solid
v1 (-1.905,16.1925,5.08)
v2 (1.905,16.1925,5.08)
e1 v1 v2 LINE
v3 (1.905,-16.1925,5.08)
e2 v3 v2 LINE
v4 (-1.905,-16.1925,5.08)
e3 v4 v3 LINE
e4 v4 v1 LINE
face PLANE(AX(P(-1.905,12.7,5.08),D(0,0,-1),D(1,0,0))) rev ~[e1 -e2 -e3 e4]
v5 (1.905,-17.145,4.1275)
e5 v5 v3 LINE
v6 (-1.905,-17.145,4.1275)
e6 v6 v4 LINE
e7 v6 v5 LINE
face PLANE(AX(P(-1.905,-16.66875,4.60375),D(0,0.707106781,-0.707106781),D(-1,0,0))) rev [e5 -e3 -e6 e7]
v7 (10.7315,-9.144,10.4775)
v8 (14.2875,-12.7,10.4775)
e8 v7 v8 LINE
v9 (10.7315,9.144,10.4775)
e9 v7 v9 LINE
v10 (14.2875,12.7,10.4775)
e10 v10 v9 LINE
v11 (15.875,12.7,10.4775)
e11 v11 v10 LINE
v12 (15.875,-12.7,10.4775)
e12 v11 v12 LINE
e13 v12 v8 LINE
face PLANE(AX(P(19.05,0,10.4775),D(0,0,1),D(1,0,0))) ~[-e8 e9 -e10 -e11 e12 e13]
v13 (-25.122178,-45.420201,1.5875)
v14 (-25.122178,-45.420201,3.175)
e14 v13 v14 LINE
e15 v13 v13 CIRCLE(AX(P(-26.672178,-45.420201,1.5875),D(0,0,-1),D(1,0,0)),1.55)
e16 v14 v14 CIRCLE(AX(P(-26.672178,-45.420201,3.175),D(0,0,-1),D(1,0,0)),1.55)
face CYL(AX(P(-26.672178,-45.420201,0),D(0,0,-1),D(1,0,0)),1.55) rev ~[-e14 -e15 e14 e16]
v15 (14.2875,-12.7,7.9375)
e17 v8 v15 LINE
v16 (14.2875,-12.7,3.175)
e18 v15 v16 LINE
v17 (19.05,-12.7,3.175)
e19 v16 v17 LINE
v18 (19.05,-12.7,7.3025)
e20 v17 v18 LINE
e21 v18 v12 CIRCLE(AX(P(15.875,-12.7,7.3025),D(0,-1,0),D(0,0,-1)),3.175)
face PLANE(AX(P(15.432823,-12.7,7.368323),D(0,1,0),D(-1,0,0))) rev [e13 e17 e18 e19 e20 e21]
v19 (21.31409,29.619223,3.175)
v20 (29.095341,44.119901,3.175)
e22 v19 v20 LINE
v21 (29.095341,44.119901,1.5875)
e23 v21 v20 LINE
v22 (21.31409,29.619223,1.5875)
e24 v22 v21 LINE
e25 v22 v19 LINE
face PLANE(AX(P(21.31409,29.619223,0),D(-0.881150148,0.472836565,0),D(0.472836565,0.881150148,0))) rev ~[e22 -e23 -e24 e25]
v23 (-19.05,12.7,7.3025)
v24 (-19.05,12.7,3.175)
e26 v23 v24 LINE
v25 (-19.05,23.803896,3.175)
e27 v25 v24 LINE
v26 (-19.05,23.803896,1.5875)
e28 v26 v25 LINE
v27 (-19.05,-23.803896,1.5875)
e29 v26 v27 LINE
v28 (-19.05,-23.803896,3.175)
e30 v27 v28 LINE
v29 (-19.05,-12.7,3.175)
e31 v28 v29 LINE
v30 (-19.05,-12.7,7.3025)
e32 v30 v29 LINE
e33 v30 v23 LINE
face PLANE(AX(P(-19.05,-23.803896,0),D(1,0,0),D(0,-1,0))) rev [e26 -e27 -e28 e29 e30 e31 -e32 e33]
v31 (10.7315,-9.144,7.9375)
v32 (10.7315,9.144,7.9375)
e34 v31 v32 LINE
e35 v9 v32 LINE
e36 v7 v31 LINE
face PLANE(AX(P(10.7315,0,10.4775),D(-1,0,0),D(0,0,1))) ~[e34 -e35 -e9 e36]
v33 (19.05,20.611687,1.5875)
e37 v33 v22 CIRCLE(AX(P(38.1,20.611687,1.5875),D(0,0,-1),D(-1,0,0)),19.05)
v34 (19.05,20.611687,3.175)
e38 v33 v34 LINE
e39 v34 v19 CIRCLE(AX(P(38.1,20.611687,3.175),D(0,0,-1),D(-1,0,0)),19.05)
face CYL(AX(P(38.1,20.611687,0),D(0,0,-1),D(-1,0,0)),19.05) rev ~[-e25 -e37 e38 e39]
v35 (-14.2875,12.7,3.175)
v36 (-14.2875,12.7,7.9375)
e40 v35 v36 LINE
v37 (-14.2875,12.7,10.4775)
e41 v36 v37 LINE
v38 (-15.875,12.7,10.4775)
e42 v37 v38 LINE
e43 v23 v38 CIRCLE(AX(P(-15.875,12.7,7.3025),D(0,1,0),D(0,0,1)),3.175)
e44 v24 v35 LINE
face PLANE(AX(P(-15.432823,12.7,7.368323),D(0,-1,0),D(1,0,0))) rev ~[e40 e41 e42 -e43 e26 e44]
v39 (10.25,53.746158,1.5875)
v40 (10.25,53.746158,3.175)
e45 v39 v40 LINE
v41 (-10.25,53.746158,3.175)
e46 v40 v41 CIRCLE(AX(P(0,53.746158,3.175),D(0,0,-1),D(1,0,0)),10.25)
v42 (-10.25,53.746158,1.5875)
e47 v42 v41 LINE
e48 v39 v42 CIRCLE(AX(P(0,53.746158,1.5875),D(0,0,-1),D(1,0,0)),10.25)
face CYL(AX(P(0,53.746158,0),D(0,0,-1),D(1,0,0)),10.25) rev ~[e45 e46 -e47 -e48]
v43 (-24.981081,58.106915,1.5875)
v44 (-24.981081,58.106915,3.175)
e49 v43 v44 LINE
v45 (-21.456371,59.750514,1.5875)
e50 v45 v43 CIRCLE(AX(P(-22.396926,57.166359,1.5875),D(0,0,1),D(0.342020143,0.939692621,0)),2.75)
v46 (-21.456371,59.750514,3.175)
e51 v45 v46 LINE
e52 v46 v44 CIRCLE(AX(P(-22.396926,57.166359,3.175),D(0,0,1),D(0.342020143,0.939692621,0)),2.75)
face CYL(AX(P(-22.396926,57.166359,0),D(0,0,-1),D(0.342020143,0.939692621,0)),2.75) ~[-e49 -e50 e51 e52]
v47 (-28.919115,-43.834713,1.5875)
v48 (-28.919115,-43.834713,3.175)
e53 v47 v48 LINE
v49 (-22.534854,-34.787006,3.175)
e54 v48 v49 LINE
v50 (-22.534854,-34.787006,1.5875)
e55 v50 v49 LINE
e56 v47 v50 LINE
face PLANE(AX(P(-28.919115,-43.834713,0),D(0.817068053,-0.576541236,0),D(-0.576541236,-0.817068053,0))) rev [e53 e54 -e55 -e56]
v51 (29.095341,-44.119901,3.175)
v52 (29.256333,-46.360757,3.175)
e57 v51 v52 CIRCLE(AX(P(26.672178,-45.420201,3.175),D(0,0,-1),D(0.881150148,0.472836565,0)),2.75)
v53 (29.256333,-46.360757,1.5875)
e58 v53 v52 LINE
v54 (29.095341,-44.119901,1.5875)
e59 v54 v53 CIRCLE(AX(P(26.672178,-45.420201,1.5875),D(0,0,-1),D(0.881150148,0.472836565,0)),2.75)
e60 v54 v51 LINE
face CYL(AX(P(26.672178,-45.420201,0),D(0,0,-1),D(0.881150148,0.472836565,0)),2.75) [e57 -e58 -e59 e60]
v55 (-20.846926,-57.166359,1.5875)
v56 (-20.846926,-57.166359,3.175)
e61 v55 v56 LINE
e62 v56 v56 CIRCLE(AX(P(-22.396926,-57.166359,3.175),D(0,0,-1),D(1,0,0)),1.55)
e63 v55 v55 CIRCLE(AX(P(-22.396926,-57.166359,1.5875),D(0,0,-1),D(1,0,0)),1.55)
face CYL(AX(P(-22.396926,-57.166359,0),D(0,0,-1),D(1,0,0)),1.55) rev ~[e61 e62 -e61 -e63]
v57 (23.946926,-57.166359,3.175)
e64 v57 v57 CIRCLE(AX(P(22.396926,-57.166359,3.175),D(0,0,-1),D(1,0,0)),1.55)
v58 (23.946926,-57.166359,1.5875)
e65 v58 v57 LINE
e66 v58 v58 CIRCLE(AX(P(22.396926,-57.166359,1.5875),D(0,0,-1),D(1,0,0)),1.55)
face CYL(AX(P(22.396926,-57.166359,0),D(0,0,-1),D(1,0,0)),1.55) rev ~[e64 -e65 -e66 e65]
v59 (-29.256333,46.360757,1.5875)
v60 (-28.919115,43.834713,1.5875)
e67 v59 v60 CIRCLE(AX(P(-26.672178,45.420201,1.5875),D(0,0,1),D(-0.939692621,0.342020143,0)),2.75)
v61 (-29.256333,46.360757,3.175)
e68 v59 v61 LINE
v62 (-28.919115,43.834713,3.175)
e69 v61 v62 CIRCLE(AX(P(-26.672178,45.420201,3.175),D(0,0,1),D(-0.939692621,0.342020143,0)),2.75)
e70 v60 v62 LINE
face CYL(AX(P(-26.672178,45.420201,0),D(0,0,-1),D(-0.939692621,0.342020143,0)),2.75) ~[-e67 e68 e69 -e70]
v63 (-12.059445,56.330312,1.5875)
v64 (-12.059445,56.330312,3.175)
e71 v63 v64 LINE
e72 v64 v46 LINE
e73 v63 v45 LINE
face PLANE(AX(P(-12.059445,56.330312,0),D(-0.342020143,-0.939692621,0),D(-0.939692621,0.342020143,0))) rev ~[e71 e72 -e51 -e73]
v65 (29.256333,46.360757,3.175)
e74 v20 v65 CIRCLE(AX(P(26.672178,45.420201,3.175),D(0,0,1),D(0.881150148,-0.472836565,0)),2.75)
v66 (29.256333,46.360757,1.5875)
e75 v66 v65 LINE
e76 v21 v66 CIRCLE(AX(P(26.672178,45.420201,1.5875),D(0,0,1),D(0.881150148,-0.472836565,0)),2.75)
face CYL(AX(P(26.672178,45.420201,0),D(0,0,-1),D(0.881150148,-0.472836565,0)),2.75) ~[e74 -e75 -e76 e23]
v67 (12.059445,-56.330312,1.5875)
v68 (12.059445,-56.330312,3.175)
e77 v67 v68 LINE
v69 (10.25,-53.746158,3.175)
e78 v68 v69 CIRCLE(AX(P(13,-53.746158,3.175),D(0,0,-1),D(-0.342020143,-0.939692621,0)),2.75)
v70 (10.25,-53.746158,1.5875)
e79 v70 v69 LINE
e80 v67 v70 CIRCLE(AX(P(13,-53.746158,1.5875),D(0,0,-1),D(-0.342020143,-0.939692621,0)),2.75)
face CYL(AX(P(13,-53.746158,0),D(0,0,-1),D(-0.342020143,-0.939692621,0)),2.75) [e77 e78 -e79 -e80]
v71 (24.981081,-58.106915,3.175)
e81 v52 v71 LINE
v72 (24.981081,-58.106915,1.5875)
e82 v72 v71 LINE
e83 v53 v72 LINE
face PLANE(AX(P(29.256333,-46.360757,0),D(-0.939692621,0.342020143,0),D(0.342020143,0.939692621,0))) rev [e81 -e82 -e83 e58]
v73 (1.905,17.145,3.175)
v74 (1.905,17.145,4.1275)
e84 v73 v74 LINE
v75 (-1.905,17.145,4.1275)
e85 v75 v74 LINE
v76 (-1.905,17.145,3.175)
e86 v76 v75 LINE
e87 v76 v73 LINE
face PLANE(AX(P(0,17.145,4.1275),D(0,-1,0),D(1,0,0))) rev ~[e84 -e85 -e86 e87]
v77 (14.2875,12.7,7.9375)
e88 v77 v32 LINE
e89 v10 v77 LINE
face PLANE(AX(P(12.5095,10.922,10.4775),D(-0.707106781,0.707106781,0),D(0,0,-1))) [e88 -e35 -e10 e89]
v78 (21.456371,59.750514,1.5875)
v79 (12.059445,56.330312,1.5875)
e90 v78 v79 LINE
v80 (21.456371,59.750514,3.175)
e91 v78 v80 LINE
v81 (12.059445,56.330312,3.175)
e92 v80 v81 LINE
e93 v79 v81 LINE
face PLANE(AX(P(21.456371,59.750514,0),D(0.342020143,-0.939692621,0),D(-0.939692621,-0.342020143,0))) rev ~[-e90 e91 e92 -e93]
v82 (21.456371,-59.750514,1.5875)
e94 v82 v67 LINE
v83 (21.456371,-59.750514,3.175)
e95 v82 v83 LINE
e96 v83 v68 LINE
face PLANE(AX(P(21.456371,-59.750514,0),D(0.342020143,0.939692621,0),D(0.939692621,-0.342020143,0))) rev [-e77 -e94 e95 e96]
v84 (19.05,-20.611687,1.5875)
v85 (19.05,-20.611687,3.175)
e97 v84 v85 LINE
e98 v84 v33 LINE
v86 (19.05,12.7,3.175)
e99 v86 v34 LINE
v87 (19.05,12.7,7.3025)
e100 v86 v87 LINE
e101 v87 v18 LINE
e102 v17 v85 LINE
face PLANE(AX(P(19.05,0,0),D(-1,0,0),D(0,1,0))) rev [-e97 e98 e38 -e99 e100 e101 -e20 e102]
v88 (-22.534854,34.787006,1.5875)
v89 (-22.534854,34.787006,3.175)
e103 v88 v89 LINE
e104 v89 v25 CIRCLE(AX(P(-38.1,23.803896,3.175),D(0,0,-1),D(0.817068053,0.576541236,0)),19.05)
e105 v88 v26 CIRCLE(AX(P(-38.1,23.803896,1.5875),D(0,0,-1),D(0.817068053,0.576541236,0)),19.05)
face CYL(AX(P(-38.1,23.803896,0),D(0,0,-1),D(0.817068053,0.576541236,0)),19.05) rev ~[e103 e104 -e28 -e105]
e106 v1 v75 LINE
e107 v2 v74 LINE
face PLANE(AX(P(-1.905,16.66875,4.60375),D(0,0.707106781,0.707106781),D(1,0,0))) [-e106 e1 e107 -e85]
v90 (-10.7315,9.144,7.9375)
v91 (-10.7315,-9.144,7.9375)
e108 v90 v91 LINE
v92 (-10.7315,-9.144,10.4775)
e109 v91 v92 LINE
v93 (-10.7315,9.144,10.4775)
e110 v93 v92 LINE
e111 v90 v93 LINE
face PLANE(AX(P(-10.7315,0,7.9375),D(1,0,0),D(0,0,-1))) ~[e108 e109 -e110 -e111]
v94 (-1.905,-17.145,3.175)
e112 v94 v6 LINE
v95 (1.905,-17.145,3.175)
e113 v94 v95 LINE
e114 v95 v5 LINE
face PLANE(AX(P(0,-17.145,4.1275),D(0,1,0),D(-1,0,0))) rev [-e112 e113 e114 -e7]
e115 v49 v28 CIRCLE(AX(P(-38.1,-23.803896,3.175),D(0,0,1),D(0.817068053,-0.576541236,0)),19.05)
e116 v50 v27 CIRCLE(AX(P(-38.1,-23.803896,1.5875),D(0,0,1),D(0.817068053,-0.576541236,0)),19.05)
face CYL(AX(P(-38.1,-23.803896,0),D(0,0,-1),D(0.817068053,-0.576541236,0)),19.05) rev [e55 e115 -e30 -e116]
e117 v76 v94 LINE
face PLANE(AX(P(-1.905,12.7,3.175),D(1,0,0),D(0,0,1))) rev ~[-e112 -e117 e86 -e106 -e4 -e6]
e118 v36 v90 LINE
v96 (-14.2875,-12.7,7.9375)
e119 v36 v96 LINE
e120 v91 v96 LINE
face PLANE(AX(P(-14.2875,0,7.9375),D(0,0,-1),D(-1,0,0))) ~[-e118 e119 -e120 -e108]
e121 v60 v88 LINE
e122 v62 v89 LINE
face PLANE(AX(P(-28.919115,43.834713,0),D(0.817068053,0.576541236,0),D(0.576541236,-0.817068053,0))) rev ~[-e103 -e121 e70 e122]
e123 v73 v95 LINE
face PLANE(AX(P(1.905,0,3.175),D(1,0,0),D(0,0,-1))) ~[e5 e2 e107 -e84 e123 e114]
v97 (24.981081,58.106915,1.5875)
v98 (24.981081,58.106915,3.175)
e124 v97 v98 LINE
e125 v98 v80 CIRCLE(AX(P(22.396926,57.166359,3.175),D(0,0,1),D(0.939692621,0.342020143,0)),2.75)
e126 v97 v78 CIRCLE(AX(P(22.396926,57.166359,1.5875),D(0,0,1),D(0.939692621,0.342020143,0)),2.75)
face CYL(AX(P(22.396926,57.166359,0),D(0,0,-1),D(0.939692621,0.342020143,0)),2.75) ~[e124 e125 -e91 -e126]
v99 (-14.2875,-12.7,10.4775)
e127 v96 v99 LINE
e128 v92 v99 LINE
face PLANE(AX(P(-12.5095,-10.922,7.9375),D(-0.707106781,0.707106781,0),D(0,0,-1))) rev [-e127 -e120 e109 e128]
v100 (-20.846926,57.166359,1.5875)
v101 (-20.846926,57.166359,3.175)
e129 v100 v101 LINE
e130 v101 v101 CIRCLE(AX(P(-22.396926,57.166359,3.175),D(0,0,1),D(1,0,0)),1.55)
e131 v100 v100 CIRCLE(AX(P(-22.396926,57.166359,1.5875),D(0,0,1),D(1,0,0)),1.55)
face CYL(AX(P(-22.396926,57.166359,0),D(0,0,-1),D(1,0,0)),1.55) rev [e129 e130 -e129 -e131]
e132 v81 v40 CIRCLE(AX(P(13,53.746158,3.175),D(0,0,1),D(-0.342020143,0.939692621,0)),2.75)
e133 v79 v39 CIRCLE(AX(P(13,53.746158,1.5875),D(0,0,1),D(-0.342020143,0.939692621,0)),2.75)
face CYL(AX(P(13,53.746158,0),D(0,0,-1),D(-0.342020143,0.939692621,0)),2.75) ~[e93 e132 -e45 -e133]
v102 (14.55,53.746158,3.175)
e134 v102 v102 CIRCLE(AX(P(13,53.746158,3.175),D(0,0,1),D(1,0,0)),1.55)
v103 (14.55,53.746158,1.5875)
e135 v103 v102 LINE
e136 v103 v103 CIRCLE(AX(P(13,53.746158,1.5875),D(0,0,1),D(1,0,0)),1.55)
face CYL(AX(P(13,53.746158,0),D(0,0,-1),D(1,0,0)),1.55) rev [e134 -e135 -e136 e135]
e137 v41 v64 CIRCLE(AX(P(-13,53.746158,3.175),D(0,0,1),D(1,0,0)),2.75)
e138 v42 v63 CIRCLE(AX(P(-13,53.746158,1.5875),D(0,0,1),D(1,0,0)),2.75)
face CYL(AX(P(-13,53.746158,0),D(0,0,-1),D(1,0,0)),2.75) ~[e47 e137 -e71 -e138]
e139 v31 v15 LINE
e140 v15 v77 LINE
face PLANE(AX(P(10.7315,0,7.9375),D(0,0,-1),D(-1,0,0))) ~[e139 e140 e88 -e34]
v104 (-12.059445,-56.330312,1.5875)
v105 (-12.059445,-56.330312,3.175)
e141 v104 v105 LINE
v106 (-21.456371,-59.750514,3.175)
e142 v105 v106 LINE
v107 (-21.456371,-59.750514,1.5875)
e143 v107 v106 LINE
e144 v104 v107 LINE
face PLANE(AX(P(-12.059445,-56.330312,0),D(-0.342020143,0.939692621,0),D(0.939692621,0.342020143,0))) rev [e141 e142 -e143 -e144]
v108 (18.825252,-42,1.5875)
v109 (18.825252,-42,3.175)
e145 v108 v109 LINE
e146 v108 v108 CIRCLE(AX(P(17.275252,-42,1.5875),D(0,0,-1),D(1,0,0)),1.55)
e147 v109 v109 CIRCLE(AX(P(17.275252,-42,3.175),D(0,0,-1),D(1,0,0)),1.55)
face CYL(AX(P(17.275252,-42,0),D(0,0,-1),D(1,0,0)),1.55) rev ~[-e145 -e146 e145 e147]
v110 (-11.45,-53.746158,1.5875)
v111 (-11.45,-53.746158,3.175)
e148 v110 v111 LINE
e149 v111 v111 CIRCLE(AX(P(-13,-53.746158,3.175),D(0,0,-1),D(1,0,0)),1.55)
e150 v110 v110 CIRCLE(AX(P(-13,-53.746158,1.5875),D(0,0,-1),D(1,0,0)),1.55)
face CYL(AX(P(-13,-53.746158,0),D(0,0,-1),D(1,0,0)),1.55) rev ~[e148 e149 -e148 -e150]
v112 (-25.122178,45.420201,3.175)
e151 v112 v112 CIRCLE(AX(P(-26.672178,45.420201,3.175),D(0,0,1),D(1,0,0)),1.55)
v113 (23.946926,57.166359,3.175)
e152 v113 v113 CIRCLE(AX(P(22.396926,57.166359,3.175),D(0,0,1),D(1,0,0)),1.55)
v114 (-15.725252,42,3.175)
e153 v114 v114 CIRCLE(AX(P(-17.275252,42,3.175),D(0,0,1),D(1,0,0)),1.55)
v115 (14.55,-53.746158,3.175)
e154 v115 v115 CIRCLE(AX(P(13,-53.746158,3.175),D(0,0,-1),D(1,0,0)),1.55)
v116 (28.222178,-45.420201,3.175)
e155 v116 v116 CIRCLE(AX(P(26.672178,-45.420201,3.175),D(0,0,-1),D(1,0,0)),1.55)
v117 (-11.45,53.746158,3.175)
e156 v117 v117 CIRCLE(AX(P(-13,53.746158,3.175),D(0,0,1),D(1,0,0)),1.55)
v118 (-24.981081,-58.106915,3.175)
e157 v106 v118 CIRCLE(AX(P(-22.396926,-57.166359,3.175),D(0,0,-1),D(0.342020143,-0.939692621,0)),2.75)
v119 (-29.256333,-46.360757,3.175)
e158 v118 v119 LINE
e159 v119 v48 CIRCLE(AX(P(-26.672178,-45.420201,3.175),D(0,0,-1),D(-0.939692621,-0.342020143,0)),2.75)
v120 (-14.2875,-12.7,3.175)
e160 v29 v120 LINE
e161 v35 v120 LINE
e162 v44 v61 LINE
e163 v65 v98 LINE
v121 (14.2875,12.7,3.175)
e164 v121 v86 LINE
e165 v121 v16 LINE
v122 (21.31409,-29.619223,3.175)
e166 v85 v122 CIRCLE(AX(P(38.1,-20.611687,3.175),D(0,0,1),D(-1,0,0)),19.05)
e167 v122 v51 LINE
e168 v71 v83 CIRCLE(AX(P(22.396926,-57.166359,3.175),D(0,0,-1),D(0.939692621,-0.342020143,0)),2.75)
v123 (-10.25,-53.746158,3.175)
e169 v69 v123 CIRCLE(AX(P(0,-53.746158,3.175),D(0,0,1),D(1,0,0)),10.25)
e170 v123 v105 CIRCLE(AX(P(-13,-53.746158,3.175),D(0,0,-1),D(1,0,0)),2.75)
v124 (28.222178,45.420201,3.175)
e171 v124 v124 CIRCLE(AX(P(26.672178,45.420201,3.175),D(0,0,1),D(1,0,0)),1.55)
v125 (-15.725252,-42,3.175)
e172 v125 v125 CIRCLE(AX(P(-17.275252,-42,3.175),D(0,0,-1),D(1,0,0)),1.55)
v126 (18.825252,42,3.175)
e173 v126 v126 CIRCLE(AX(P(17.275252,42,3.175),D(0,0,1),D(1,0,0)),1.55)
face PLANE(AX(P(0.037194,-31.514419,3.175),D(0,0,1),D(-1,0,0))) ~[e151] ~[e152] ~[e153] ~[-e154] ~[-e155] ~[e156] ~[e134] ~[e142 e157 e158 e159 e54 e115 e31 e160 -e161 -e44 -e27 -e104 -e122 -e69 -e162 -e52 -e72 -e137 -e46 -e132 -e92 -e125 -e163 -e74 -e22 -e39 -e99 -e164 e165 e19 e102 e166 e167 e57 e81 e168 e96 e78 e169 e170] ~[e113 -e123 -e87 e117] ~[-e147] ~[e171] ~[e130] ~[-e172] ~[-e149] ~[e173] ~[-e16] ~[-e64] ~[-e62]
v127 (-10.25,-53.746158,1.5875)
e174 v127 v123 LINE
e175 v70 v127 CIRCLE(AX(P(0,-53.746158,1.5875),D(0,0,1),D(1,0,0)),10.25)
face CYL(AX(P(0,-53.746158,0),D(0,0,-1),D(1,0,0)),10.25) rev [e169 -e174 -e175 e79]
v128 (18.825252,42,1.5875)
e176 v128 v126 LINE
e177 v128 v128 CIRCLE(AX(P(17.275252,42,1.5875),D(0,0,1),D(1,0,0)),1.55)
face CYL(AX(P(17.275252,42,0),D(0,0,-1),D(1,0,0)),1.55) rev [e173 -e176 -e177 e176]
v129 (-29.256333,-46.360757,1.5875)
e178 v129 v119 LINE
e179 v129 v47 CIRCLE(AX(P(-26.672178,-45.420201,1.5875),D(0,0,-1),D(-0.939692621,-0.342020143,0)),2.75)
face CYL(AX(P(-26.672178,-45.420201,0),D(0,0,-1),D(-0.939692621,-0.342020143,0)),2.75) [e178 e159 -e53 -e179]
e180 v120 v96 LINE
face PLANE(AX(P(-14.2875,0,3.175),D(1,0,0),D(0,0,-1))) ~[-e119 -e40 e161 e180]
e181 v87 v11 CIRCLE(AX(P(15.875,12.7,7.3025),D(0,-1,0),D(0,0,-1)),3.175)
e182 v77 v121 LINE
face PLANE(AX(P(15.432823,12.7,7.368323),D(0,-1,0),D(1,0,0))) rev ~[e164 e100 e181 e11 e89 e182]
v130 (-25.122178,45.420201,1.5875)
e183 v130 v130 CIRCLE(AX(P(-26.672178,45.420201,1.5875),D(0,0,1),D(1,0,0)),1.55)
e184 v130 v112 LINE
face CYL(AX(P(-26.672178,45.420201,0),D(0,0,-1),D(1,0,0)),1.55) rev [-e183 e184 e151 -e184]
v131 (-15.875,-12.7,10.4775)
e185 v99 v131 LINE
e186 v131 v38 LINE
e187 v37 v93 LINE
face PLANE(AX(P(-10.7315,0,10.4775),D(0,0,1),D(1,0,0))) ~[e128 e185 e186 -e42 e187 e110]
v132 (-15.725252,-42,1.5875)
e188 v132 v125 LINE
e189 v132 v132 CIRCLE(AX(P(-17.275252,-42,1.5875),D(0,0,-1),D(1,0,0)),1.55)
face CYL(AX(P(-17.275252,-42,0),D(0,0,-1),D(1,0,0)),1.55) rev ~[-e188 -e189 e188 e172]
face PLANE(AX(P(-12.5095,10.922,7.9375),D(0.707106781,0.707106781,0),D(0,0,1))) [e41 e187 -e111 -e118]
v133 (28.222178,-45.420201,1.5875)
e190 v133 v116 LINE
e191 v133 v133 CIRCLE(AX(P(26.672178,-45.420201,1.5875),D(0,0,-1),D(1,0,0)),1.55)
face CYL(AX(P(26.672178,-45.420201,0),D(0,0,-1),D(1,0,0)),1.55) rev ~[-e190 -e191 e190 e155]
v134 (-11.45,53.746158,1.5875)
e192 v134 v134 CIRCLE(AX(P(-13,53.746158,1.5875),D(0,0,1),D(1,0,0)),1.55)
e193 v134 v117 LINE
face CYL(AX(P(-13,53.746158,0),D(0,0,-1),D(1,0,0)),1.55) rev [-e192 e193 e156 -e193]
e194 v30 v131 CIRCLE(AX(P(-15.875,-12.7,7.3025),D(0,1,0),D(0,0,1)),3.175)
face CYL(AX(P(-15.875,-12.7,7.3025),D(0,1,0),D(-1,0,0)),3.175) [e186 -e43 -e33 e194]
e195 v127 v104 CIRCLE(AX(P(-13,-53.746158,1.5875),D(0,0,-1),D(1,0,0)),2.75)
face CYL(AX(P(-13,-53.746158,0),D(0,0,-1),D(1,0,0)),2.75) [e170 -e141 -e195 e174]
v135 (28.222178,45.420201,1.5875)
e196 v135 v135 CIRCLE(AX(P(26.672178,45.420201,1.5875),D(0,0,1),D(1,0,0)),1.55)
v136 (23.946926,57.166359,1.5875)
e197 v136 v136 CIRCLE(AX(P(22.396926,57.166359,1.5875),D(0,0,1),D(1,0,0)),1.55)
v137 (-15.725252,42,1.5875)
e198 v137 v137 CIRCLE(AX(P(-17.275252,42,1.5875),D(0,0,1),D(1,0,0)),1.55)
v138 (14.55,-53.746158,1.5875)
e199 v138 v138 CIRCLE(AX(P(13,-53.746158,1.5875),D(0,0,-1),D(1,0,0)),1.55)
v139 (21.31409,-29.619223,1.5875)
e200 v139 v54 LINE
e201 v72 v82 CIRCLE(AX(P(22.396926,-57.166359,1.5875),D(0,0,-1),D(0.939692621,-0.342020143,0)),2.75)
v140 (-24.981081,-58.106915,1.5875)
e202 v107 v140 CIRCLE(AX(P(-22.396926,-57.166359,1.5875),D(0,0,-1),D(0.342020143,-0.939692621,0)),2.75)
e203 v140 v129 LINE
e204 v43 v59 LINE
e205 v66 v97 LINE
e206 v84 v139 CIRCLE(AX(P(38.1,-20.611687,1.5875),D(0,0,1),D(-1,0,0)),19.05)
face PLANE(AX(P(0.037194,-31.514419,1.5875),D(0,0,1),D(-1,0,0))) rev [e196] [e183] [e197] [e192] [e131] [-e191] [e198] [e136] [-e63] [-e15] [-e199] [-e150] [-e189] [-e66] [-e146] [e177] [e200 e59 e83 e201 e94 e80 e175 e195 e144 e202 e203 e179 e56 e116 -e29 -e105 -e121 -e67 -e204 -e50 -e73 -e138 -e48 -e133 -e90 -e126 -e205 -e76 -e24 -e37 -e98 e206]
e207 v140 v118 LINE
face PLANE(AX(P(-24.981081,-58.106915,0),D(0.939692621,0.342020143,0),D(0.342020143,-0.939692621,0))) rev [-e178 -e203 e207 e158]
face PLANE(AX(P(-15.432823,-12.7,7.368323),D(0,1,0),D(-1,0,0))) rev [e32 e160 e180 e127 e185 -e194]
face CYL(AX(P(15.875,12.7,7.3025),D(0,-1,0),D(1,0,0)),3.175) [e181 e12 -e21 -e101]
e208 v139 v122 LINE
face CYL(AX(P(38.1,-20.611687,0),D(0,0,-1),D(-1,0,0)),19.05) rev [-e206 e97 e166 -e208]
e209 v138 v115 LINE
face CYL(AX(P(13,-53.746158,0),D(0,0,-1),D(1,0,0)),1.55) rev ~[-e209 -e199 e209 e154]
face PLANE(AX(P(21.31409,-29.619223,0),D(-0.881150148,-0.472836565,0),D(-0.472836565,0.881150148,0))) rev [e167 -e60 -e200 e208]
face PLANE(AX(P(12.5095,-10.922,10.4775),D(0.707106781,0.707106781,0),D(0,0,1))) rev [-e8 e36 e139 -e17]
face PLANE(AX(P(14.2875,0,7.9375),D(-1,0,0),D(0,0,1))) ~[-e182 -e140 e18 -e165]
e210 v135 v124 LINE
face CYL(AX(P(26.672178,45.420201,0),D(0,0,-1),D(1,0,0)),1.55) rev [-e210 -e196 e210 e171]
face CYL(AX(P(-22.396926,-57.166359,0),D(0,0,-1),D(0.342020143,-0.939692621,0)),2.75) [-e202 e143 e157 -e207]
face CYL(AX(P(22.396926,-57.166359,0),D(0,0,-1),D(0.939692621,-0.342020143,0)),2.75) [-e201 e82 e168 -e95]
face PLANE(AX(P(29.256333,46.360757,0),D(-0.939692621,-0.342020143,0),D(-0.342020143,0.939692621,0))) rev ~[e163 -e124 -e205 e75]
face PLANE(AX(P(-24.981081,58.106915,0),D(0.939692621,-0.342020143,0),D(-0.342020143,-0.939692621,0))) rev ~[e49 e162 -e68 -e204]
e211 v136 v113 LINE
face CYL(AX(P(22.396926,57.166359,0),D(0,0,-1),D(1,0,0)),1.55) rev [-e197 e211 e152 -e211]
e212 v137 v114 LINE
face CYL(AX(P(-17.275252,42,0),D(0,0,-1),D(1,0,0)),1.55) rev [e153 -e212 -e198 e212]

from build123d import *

# Parameters (mm, degrees)
F0_R     = 1.55
F1_DEPTH = 3.175
F2_W     = 3.81
F2_H     = 1.905
F3_DEPTH = 12.7
F5_SIZE  = 3.556
F6_DEPTH = 4.445
F7_DEPTH = 4.445
F8_SIZE  = 0.9525
F9_DEPTH = 1.5875
F10_R    = 3.175


# Not quite as in the source:
# - a feature names something its author has since deleted; it is built from what else it names


with BuildPart() as f1:
    # F0 (on Top) → F1 (new body)
    with BuildSketch(Plane.XY):
        with BuildLine():
            ThreePointArc((10.25, 53.7461577598), (0, 43.4961577598), (-10.25, 53.7461577598))
            ThreePointArc((-10.25, 53.7461577598), (-10.7473318782, 55.3234929598), (-12.0594446059, 56.330312467))
            Line((-12.0594446059, 56.330312467), (-21.4563708137, 59.7505139002))
            ThreePointArc((-21.4563708137, 59.7505139002), (-23.5591264276, 59.6587056074), (-24.981080915, 58.1069145872))
            Line((-24.981080915, 58.1069145872), (-29.2563327066, 46.3607568274))
            ThreePointArc((-29.2563327066, 46.3607568274), (-29.3979964883, 45.0563146846), (-28.9191151455, 43.8347130349))
            Line((-28.9191151455, 43.8347130349), (-22.5348535878, 34.7870060575))
            ThreePointArc((-22.5348535878, 34.7870060575), (-19.9421017302, 29.5652521638), (-19.05, 23.803895516))
            Line((-19.05, 23.803895516), (-19.05, 0))
            Line((-19.05, 0), (19.05, 0))
            Line((19.05, 0), (19.05, 20.6116865479))
            ThreePointArc((19.05, 20.6116865479), (19.6246909156, 25.2555485437), (21.3140896836, 29.6192231062))
            Line((21.3140896836, 29.6192231062), (29.095340906, 44.1199008802))
            ThreePointArc((29.095340906, 44.1199008802), (29.4151082328, 45.2231386646), (29.2563327066, 46.3607568274))
            Line((29.2563327066, 46.3607568274), (24.981080915, 58.1069145872))
            ThreePointArc((24.981080915, 58.1069145872), (23.5591264276, 59.6587056074), (21.4563708137, 59.7505139002))
            Line((21.4563708137, 59.7505139002), (12.0594446059, 56.330312467))
            ThreePointArc((12.0594446059, 56.330312467), (10.7473318782, 55.3234929598), (10.25, 53.7461577598))
        make_face()
        with Locations((-17.2752517916, 42)):
            Circle(F0_R, mode=Mode.SUBTRACT)
        with Locations((-26.6721779994, 45.4202014333)):
            Circle(F0_R, mode=Mode.SUBTRACT)
        with Locations((-22.3969262079, 57.1663591931)):
            Circle(F0_R, mode=Mode.SUBTRACT)
        with Locations((-13, 53.7461577598)):
            Circle(F0_R, mode=Mode.SUBTRACT)
        with Locations((17.2752517916, 42)):
            Circle(F0_R, mode=Mode.SUBTRACT)
        with Locations((13, 53.7461577598)):
            Circle(F0_R, mode=Mode.SUBTRACT)
        with Locations((26.6721779994, 45.4202014333)):
            Circle(F0_R, mode=Mode.SUBTRACT)
        with Locations((22.3969262079, 57.1663591931)):
            Circle(F0_R, mode=Mode.SUBTRACT)
    extrude(amount=F1_DEPTH)

    # F2 (on face) → F3 (join)
    with BuildSketch(Plane.XZ):
        Polygon((14.2875, 7.9375), (14.2875, 3.175), (19.05, 3.175), (19.05, 10.4775), (10.7315, 10.4775), (10.7315, 7.9375), align=None)
        with Locations((0, 4.1275)):
            Rectangle(F2_W, F2_H)
        Polygon((-19.05, 3.175), (-14.2875, 3.175), (-14.2875, 7.9375), (-10.7315, 7.9375), (-10.7315, 10.4775), (-19.05, 10.4775), align=None)
    extrude(amount=-F3_DEPTH)

    # F4: F1 across face


with BuildPart() as f1_1:
    add(f1.part)
    add(f1.part.mirror(Plane(origin=(0, 0, 3.9988214553), x_dir=(1, 0, 0), z_dir=(0, -1, 0))))

    # F5
    f5_edges = [f1_1.edges().sort_by_distance(p)[0] for p in [
        (10.7315, -12.7, 9.2075),
        (-10.7315, -12.7, 9.2075),
        (-10.7315, 12.7, 9.2075),
        (10.7315, 12.7, 9.2075),
    ]]
    chamfer(f5_edges, length=F5_SIZE)

    # F6 (add): a face of the model
    f6_faces = [f1_1.faces().sort_by_distance(p)[0] for p in [
        (0, -12.7, 4.1275),
    ]]
    extrude(f6_faces, amount=F6_DEPTH)

    # F7 (add): a face of the model
    f7_faces = [f1_1.faces().sort_by_distance(p)[0] for p in [
        (0, 12.7, 4.1275),
    ]]
    extrude(f7_faces, amount=F7_DEPTH)

    # F8
    f8_edges = [f1_1.edges().sort_by_distance(p)[0] for p in [
        (0, 17.145, 5.08),
        (0, -17.145, 5.08),
    ]]
    chamfer(f8_edges, length=F8_SIZE)

    # F9 (cut): a face of the model
    f9_faces = [f1_1.faces().sort_by_distance(p)[0] for p in [
        (0.1994717604, 0, 0),
    ]]
    extrude(f9_faces, amount=-F9_DEPTH, mode=Mode.SUBTRACT)

    # F10
    f10_edges = [f1_1.edges().sort_by_distance(p)[0] for p in [
        (-19.05, 0, 10.4775),
        (19.05, 0, 10.4775),
    ]]
    fillet(f10_edges, radius=F10_R)


solid = f1_1.part
